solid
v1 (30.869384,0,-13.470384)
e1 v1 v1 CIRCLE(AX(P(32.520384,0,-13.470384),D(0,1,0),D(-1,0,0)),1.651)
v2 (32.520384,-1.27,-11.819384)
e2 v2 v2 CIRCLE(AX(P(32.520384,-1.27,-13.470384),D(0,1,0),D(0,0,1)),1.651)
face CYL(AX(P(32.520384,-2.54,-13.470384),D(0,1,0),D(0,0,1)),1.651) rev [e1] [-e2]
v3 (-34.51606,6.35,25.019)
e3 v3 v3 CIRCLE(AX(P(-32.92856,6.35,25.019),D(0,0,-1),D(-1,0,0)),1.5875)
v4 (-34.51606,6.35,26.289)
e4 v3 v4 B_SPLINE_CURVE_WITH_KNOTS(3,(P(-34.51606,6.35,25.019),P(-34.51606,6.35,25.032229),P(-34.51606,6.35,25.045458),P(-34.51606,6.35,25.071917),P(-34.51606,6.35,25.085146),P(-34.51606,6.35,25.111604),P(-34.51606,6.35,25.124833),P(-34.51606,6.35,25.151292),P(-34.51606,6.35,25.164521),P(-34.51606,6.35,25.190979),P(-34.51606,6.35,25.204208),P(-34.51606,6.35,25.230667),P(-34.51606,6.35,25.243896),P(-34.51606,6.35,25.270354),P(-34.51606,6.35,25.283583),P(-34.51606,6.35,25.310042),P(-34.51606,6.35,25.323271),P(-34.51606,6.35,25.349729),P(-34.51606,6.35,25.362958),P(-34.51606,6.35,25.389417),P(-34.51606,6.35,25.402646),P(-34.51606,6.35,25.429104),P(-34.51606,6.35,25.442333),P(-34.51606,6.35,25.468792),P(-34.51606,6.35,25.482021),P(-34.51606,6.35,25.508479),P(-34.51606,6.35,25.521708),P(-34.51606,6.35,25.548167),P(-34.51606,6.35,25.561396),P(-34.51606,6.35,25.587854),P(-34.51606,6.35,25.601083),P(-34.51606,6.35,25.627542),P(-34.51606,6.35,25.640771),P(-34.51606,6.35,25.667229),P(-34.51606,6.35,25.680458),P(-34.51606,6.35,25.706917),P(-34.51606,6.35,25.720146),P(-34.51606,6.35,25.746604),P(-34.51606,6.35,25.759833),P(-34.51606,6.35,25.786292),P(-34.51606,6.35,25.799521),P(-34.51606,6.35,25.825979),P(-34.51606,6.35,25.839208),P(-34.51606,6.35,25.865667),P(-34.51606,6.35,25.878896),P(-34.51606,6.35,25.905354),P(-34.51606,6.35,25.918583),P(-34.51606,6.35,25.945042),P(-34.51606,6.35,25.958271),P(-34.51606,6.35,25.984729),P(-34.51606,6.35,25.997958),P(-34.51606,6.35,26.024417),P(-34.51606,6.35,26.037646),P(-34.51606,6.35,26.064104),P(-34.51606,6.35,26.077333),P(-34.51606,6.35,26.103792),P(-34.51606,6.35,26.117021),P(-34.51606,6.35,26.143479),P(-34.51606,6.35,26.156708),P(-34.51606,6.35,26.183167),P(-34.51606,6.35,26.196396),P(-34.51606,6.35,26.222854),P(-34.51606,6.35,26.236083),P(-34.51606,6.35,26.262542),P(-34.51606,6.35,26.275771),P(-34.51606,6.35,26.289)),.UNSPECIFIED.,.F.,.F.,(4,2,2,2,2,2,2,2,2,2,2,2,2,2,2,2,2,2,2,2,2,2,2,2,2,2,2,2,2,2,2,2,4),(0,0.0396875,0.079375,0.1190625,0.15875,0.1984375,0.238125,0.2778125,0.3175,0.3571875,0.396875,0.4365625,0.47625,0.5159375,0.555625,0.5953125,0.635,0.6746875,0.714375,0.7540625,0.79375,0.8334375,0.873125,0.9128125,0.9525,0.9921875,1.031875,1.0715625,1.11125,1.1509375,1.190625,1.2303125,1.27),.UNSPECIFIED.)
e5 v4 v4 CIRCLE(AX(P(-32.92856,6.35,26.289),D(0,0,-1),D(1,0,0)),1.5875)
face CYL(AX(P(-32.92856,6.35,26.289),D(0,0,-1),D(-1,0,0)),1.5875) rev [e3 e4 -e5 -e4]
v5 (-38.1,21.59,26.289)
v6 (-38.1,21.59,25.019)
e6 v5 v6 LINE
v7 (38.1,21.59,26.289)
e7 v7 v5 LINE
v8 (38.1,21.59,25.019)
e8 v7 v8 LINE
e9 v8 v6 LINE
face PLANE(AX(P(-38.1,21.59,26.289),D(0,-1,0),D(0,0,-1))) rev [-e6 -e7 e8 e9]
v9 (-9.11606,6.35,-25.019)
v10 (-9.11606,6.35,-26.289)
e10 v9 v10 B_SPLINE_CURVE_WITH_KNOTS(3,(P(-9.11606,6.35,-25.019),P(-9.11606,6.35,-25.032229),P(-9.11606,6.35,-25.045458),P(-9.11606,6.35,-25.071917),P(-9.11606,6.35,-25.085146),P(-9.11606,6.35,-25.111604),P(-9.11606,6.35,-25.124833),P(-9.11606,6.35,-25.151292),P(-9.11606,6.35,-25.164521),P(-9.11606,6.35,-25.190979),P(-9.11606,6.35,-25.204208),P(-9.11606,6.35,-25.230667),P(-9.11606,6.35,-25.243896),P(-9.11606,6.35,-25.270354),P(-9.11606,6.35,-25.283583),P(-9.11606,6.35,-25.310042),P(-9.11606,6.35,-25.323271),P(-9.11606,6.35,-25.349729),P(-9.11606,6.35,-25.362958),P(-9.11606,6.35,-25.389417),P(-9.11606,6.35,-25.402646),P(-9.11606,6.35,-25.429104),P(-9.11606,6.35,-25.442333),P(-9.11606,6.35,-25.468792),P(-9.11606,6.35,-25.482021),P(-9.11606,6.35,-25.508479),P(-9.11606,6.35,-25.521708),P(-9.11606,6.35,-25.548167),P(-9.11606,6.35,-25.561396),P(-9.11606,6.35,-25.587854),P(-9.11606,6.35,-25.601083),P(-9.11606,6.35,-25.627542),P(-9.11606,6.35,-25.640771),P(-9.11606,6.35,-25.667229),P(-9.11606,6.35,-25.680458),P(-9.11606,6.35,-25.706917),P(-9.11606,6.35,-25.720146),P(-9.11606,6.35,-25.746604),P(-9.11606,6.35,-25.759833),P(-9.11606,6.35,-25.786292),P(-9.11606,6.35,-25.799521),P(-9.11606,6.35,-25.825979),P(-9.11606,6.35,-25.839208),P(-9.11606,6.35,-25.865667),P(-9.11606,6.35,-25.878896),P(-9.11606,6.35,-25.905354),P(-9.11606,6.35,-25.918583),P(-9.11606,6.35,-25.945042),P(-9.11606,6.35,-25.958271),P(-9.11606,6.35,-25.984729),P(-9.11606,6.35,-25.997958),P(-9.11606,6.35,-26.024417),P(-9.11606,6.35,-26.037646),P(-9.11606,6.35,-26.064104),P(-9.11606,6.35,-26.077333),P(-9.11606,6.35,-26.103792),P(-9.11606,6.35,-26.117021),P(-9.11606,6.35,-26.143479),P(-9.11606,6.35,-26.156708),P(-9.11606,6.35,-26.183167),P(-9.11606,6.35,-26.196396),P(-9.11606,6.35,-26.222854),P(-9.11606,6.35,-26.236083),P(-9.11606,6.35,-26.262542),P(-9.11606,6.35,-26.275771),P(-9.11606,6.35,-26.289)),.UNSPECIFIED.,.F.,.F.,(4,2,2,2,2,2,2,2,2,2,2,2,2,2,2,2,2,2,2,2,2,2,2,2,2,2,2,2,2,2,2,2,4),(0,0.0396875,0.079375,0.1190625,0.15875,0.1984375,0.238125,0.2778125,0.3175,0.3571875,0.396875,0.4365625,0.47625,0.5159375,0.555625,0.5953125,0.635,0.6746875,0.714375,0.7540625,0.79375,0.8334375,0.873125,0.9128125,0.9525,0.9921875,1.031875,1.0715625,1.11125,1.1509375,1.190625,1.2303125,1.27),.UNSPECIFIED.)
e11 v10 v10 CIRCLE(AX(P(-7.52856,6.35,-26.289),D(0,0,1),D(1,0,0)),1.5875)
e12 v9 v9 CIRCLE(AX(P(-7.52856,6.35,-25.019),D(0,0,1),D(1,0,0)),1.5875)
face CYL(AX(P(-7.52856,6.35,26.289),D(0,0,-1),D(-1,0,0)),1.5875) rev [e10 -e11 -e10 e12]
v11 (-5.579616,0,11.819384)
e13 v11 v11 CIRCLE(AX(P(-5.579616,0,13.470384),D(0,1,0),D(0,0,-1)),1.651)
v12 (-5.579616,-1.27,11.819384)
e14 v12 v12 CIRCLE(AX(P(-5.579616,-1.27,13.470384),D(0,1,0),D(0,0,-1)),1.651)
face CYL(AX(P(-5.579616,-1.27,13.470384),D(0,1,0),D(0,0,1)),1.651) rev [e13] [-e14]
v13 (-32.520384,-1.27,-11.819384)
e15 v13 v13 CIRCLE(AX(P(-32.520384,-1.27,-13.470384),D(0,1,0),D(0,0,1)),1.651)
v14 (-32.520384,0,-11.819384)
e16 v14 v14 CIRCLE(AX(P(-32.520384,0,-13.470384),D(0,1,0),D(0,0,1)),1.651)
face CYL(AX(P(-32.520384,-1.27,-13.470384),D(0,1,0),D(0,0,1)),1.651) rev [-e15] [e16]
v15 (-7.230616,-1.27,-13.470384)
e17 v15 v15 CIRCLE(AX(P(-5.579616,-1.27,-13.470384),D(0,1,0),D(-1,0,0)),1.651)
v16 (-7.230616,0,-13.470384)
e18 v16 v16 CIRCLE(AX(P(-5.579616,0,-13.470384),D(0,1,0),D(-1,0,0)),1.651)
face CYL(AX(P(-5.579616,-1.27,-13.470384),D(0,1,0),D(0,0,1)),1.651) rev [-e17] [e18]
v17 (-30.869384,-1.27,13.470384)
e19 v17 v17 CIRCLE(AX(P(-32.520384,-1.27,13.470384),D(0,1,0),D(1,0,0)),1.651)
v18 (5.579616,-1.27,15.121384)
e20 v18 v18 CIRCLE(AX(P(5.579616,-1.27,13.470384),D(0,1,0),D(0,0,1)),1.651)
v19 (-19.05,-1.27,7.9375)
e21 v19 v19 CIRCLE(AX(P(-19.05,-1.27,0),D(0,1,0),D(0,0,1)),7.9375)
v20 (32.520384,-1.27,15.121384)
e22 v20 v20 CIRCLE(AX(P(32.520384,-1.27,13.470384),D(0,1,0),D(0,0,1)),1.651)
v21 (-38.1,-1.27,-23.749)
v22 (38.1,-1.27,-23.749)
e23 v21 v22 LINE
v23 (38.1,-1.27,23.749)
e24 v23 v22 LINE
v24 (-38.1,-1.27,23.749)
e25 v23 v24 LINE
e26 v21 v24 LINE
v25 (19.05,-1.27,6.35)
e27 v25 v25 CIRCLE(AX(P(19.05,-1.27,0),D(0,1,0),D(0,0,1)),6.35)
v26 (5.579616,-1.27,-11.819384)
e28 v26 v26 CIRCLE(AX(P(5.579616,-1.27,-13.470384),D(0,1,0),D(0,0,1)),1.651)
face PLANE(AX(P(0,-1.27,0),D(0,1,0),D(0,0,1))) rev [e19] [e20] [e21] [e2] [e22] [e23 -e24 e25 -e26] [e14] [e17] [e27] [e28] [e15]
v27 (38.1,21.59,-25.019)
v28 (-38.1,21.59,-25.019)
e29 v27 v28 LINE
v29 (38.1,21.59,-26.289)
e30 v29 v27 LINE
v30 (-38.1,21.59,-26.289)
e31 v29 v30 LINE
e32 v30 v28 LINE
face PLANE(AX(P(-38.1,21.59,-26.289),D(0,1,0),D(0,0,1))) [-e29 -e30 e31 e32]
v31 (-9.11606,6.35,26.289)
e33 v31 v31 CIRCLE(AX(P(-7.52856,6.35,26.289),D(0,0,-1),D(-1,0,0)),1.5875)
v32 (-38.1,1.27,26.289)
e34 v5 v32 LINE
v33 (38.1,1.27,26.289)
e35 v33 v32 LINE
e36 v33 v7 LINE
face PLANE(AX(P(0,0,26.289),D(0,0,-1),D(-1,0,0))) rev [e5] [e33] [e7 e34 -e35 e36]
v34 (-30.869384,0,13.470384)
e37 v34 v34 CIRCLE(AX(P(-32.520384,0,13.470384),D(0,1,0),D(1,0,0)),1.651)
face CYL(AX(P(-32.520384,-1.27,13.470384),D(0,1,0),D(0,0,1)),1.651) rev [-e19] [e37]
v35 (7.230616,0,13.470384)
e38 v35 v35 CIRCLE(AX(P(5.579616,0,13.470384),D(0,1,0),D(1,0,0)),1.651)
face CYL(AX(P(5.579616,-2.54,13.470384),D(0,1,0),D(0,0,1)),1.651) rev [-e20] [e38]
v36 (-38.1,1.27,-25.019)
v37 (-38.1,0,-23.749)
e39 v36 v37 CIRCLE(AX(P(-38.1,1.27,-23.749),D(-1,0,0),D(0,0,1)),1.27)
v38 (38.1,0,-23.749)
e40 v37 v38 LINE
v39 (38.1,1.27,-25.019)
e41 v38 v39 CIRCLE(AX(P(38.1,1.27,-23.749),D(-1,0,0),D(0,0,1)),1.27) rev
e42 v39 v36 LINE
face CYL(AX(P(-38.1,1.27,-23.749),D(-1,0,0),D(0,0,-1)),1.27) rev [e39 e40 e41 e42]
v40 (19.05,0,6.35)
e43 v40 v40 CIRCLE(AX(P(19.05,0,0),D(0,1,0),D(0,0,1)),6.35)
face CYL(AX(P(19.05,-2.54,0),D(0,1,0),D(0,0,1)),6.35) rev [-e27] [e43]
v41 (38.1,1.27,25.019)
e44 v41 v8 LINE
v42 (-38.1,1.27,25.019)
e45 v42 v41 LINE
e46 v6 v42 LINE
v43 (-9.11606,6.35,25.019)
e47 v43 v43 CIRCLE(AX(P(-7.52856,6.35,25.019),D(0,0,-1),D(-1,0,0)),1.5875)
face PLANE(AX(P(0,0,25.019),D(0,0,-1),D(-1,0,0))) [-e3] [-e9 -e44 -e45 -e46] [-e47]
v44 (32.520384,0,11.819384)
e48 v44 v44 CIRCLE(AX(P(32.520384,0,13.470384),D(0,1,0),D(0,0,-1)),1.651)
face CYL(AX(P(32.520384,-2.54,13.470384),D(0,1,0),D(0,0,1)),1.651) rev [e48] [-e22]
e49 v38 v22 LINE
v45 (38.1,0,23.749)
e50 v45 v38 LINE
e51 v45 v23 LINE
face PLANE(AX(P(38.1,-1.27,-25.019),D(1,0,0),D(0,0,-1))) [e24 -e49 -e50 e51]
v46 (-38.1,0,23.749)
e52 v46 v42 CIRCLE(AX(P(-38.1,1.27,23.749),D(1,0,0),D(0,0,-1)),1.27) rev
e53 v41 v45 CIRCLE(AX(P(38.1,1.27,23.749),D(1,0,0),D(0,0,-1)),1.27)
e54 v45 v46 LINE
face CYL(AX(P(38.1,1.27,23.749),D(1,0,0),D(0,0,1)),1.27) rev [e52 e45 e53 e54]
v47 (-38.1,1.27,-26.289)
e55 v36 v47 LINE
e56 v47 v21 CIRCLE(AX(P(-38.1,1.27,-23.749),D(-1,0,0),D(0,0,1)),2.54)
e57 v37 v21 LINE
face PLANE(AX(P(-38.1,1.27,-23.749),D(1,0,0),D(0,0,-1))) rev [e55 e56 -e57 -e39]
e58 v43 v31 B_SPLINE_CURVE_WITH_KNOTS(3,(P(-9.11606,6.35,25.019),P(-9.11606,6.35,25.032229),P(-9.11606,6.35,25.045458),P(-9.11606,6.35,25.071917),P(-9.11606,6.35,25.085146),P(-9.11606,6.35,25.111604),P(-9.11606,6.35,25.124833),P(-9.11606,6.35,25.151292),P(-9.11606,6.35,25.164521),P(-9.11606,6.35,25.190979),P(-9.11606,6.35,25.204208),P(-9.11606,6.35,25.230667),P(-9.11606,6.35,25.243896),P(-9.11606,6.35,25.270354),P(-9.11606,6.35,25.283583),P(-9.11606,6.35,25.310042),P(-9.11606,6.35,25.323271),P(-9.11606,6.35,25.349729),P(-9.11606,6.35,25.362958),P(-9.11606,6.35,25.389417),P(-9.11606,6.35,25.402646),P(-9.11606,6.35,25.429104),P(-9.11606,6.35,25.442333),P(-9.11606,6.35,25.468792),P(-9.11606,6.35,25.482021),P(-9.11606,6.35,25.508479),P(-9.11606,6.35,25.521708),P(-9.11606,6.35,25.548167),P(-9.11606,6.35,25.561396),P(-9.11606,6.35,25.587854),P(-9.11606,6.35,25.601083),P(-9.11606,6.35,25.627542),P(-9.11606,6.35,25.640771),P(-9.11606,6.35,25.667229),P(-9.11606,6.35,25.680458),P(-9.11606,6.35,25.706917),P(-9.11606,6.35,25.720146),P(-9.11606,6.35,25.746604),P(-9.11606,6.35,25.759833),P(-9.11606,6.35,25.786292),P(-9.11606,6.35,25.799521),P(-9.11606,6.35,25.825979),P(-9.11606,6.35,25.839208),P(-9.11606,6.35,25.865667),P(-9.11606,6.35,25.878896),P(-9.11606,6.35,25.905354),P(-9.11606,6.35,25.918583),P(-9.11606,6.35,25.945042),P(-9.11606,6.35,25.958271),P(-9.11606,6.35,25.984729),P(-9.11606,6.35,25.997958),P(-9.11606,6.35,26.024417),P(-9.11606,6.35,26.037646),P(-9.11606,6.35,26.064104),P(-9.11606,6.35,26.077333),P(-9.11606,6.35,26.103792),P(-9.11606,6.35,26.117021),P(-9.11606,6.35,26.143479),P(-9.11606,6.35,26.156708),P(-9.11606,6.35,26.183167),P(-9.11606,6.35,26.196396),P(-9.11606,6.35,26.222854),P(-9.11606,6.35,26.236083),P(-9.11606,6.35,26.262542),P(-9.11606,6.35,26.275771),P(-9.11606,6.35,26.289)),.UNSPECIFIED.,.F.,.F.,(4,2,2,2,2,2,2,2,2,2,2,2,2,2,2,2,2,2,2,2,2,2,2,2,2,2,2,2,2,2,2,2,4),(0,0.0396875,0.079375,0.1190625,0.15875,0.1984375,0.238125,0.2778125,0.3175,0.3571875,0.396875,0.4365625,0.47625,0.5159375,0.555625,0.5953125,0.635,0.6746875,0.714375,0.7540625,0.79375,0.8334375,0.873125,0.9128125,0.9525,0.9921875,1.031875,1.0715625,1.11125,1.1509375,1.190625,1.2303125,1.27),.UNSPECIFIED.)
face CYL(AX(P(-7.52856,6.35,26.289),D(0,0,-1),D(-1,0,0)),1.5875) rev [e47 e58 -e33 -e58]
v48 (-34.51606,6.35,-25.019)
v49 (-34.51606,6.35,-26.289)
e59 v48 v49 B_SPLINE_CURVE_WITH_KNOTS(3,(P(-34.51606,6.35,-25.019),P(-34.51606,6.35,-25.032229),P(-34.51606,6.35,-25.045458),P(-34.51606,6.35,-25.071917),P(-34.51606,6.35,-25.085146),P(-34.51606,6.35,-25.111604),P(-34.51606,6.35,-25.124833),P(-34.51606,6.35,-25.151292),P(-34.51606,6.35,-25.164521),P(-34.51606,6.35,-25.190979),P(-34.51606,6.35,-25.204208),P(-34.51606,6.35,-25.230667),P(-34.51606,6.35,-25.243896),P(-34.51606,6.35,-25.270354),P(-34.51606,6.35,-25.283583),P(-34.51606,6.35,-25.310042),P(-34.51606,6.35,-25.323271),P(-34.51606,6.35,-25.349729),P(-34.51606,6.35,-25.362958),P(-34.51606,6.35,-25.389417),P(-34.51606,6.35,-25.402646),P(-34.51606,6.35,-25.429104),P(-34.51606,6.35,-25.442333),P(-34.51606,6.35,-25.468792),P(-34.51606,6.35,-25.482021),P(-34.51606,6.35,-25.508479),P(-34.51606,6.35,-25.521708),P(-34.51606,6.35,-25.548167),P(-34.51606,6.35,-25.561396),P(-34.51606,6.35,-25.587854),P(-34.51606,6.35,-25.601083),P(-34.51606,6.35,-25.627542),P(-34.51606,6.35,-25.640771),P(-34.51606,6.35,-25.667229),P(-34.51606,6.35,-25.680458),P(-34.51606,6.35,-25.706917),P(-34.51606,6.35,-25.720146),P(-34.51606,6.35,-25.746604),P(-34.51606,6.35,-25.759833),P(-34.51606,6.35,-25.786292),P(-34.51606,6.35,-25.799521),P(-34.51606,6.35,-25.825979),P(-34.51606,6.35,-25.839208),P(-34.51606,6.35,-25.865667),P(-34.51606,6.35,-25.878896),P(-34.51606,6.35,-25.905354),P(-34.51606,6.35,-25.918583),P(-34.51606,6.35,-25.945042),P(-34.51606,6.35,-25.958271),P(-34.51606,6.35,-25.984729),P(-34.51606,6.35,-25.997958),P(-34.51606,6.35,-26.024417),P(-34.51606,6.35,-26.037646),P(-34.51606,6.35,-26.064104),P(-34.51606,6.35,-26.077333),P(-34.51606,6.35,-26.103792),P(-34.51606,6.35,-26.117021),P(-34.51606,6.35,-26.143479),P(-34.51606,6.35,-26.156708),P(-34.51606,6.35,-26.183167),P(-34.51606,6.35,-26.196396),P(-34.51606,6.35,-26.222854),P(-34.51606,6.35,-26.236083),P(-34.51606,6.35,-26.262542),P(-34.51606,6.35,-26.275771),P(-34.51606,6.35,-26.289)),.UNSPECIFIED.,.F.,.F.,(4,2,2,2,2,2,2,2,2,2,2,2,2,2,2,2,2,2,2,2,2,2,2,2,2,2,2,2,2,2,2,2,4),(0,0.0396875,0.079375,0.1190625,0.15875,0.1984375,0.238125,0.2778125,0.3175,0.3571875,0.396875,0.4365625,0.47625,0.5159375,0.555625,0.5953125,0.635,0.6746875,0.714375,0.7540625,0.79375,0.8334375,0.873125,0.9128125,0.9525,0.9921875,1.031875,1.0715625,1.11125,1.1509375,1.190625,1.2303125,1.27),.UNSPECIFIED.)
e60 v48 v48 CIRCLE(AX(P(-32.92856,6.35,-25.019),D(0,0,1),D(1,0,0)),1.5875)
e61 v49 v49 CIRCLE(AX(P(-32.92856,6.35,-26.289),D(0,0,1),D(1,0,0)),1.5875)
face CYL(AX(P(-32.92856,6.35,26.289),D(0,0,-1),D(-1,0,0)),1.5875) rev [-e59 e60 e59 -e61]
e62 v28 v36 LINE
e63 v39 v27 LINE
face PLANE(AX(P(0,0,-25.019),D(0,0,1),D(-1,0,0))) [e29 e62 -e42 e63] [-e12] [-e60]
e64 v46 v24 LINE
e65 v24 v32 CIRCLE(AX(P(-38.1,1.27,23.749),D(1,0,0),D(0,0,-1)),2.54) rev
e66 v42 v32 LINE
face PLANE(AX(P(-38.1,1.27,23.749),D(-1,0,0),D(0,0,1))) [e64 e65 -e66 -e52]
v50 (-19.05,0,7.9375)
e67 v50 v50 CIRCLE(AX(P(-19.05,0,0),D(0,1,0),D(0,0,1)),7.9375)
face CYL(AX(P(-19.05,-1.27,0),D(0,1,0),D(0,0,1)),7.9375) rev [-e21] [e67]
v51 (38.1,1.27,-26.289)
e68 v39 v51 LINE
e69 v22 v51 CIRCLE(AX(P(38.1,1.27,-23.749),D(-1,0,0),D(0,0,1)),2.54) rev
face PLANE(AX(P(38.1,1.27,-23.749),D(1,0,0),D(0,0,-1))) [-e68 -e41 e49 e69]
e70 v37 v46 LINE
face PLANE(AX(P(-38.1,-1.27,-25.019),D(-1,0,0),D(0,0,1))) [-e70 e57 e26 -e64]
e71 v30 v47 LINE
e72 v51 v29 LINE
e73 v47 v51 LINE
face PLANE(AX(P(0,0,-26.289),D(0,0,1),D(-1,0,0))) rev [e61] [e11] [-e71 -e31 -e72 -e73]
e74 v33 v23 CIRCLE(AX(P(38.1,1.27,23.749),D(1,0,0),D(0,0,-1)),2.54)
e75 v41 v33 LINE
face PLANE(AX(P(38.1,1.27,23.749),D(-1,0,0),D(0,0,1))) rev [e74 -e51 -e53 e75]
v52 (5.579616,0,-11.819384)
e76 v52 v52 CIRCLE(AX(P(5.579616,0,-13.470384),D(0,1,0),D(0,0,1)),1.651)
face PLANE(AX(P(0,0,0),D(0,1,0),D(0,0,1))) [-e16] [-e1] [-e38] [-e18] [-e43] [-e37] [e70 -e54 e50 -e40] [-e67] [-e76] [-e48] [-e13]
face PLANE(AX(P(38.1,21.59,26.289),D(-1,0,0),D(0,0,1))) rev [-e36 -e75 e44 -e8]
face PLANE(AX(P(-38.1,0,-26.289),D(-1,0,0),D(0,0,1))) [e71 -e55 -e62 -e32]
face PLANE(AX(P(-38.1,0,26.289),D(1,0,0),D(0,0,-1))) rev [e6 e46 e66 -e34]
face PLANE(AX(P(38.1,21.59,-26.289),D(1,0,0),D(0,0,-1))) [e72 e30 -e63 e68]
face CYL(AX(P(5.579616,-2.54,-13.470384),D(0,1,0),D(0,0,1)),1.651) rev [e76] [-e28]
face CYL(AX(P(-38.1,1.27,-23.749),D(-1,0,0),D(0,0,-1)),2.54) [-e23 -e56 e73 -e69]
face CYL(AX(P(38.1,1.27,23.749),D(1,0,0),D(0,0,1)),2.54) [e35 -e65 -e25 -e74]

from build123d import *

# Parameters (mm, degrees)
SKETCH1_W                    = 76.2
SKETCH1_H                    = 50.038
SKETCH1_R                    = 7.9375
BASE_FLANGE1_DEPTH           = 1.27
EDGE_FLANGE1_STRIP_W         = 7.62
EDGE_FLANGE1_STRIP_H         = 1.27
EDGE_FLANGE1_STRIP_CUT_DEPTH = 76.2
EDGE_FLANGE1_DEPTH           = 76.2
SKETCH9_R                    = 1.651
CUT_EXTRUDE3_DEPTH           = 52.076899093
CIRPATTERN2_COUNT            = 4
SKETCH11_R                   = 6.35
SKETCH11_R_2                 = 1.651
CUT_EXTRUDE4_DEPTH           = 2.54
CIRPATTERN3_COUNT            = 4
CUT_EXTRUDE2_DEPTH           = 69.426487445
CUT_EXTRUDE2_DEPTH_BACK      = 69.426487445
SKETCH10_R                   = 1.5875


# Sheet-metal steps are written as plain solids
with BuildPart() as part:
    # Sketch1 → Base-Flange1 (new body)
    with BuildSketch(Plane(origin=(0, 0, 0), x_dir=(1, 0, 0), z_dir=(0, 1, 0))):
        Rectangle(SKETCH1_W, SKETCH1_H)
        with Locations(Location((-19.05, 0, 0), (0, 0, 270))):
            Circle(SKETCH1_R, mode=Mode.SUBTRACT)
    extrude(amount=-BASE_FLANGE1_DEPTH)

    # Edge-Flange1 strip (across the edge) → Edge-Flange1 strip cut (cut)
    with BuildSketch(Plane(origin=(-38.1, 0, 25.019), x_dir=(0, 0, -1), z_dir=(1, 0, 0))):
        with Locations((-2.54, -0.635)):
            Rectangle(EDGE_FLANGE1_STRIP_W, EDGE_FLANGE1_STRIP_H)
    edge_flange1_strip_cut = extrude(amount=EDGE_FLANGE1_STRIP_CUT_DEPTH, mode=Mode.SUBTRACT)

    # Edge-Flange1 section (across the edge) → Edge-Flange1 (add)
    with BuildSketch(Plane(origin=(-38.1, 0, 25.019), x_dir=(0, 0, -1), z_dir=(1, 0, 0))):
        with BuildLine():
            Line((-1.27, 1.27), (-1.27, 21.59))
            Line((-1.27, 21.59), (0, 21.59))
            Line((0, 21.59), (0, 1.27))
            ThreePointArc((0, 1.27), (0.371974388, 0.371974388), (1.27, 0))
            Line((1.27, 0), (1.27, -1.27))
            ThreePointArc((1.27, -1.27), (-0.526051224, -0.526051224), (-1.27, 1.27))
        make_face()
    edge_flange1 = extrude(amount=EDGE_FLANGE1_DEPTH)

    # Mirror1: Edge-Flange1 strip cut, Edge-Flange1 across plane
    add(edge_flange1_strip_cut.mirror(Plane.XY), mode=Mode.SUBTRACT)
    add(edge_flange1.mirror(Plane.XY))

    # Sketch9 → Cut-Extrude3 (cut, through all)
    with BuildSketch(Plane(origin=(0, 0, 0), x_dir=(1, 0, 0), z_dir=(0, 1, 0))):
        with Locations(Location((-32.520384182, 13.470384182, 0), (0, 0, 270))):
            Circle(SKETCH9_R)
    cut_extrude3 = extrude(amount=-CUT_EXTRUDE3_DEPTH, mode=Mode.SUBTRACT)

    # CirPattern2: Cut-Extrude3 ×4 about axis
    cirpattern2_axis = Axis((-19.05, 0, 0), (0, 1, 0))
    for i in range(1, CIRPATTERN2_COUNT):
        add(cut_extrude3.rotate(cirpattern2_axis, i * 360 / CIRPATTERN2_COUNT), mode=Mode.SUBTRACT)

    # Sketch11 → Cut-Extrude4 (cut)
    with BuildSketch(Plane(origin=(0, 0, 0), x_dir=(1, 0, 0), z_dir=(0, 1, 0))):
        with Locations(Location((19.05, 0, 0), (0, 0, 270))):
            Circle(SKETCH11_R)
        with Locations(Location((5.579615818, 13.470384182, 0), (0, 0, 270))):
            Circle(SKETCH11_R_2)
    cut_extrude4 = extrude(amount=-CUT_EXTRUDE4_DEPTH, mode=Mode.SUBTRACT)

    # CirPattern3: Cut-Extrude4 ×4 about axis
    cirpattern3_axis = Axis((19.05, 0, 0), (0, 1, 0))
    for i in range(1, CIRPATTERN3_COUNT):
        add(cut_extrude4.rotate(cirpattern3_axis, i * 360 / CIRPATTERN3_COUNT), mode=Mode.SUBTRACT)

    # Sketch10 → Cut-Extrude2 (cut, two sides: drawn at the far end of the back side and taken through both)
    with BuildSketch(Plane(origin=(0, 0, -26.289), x_dir=(-1, 0, 0), z_dir=(0, 0, -1)).offset(-CUT_EXTRUDE2_DEPTH_BACK)):
        with Locations((7.52856, 6.35)):
            Circle(SKETCH10_R)
        with Locations((32.92856, 6.35)):
            Circle(SKETCH10_R)
    extrude(amount=CUT_EXTRUDE2_DEPTH + CUT_EXTRUDE2_DEPTH_BACK, mode=Mode.SUBTRACT)


solid = part.part
